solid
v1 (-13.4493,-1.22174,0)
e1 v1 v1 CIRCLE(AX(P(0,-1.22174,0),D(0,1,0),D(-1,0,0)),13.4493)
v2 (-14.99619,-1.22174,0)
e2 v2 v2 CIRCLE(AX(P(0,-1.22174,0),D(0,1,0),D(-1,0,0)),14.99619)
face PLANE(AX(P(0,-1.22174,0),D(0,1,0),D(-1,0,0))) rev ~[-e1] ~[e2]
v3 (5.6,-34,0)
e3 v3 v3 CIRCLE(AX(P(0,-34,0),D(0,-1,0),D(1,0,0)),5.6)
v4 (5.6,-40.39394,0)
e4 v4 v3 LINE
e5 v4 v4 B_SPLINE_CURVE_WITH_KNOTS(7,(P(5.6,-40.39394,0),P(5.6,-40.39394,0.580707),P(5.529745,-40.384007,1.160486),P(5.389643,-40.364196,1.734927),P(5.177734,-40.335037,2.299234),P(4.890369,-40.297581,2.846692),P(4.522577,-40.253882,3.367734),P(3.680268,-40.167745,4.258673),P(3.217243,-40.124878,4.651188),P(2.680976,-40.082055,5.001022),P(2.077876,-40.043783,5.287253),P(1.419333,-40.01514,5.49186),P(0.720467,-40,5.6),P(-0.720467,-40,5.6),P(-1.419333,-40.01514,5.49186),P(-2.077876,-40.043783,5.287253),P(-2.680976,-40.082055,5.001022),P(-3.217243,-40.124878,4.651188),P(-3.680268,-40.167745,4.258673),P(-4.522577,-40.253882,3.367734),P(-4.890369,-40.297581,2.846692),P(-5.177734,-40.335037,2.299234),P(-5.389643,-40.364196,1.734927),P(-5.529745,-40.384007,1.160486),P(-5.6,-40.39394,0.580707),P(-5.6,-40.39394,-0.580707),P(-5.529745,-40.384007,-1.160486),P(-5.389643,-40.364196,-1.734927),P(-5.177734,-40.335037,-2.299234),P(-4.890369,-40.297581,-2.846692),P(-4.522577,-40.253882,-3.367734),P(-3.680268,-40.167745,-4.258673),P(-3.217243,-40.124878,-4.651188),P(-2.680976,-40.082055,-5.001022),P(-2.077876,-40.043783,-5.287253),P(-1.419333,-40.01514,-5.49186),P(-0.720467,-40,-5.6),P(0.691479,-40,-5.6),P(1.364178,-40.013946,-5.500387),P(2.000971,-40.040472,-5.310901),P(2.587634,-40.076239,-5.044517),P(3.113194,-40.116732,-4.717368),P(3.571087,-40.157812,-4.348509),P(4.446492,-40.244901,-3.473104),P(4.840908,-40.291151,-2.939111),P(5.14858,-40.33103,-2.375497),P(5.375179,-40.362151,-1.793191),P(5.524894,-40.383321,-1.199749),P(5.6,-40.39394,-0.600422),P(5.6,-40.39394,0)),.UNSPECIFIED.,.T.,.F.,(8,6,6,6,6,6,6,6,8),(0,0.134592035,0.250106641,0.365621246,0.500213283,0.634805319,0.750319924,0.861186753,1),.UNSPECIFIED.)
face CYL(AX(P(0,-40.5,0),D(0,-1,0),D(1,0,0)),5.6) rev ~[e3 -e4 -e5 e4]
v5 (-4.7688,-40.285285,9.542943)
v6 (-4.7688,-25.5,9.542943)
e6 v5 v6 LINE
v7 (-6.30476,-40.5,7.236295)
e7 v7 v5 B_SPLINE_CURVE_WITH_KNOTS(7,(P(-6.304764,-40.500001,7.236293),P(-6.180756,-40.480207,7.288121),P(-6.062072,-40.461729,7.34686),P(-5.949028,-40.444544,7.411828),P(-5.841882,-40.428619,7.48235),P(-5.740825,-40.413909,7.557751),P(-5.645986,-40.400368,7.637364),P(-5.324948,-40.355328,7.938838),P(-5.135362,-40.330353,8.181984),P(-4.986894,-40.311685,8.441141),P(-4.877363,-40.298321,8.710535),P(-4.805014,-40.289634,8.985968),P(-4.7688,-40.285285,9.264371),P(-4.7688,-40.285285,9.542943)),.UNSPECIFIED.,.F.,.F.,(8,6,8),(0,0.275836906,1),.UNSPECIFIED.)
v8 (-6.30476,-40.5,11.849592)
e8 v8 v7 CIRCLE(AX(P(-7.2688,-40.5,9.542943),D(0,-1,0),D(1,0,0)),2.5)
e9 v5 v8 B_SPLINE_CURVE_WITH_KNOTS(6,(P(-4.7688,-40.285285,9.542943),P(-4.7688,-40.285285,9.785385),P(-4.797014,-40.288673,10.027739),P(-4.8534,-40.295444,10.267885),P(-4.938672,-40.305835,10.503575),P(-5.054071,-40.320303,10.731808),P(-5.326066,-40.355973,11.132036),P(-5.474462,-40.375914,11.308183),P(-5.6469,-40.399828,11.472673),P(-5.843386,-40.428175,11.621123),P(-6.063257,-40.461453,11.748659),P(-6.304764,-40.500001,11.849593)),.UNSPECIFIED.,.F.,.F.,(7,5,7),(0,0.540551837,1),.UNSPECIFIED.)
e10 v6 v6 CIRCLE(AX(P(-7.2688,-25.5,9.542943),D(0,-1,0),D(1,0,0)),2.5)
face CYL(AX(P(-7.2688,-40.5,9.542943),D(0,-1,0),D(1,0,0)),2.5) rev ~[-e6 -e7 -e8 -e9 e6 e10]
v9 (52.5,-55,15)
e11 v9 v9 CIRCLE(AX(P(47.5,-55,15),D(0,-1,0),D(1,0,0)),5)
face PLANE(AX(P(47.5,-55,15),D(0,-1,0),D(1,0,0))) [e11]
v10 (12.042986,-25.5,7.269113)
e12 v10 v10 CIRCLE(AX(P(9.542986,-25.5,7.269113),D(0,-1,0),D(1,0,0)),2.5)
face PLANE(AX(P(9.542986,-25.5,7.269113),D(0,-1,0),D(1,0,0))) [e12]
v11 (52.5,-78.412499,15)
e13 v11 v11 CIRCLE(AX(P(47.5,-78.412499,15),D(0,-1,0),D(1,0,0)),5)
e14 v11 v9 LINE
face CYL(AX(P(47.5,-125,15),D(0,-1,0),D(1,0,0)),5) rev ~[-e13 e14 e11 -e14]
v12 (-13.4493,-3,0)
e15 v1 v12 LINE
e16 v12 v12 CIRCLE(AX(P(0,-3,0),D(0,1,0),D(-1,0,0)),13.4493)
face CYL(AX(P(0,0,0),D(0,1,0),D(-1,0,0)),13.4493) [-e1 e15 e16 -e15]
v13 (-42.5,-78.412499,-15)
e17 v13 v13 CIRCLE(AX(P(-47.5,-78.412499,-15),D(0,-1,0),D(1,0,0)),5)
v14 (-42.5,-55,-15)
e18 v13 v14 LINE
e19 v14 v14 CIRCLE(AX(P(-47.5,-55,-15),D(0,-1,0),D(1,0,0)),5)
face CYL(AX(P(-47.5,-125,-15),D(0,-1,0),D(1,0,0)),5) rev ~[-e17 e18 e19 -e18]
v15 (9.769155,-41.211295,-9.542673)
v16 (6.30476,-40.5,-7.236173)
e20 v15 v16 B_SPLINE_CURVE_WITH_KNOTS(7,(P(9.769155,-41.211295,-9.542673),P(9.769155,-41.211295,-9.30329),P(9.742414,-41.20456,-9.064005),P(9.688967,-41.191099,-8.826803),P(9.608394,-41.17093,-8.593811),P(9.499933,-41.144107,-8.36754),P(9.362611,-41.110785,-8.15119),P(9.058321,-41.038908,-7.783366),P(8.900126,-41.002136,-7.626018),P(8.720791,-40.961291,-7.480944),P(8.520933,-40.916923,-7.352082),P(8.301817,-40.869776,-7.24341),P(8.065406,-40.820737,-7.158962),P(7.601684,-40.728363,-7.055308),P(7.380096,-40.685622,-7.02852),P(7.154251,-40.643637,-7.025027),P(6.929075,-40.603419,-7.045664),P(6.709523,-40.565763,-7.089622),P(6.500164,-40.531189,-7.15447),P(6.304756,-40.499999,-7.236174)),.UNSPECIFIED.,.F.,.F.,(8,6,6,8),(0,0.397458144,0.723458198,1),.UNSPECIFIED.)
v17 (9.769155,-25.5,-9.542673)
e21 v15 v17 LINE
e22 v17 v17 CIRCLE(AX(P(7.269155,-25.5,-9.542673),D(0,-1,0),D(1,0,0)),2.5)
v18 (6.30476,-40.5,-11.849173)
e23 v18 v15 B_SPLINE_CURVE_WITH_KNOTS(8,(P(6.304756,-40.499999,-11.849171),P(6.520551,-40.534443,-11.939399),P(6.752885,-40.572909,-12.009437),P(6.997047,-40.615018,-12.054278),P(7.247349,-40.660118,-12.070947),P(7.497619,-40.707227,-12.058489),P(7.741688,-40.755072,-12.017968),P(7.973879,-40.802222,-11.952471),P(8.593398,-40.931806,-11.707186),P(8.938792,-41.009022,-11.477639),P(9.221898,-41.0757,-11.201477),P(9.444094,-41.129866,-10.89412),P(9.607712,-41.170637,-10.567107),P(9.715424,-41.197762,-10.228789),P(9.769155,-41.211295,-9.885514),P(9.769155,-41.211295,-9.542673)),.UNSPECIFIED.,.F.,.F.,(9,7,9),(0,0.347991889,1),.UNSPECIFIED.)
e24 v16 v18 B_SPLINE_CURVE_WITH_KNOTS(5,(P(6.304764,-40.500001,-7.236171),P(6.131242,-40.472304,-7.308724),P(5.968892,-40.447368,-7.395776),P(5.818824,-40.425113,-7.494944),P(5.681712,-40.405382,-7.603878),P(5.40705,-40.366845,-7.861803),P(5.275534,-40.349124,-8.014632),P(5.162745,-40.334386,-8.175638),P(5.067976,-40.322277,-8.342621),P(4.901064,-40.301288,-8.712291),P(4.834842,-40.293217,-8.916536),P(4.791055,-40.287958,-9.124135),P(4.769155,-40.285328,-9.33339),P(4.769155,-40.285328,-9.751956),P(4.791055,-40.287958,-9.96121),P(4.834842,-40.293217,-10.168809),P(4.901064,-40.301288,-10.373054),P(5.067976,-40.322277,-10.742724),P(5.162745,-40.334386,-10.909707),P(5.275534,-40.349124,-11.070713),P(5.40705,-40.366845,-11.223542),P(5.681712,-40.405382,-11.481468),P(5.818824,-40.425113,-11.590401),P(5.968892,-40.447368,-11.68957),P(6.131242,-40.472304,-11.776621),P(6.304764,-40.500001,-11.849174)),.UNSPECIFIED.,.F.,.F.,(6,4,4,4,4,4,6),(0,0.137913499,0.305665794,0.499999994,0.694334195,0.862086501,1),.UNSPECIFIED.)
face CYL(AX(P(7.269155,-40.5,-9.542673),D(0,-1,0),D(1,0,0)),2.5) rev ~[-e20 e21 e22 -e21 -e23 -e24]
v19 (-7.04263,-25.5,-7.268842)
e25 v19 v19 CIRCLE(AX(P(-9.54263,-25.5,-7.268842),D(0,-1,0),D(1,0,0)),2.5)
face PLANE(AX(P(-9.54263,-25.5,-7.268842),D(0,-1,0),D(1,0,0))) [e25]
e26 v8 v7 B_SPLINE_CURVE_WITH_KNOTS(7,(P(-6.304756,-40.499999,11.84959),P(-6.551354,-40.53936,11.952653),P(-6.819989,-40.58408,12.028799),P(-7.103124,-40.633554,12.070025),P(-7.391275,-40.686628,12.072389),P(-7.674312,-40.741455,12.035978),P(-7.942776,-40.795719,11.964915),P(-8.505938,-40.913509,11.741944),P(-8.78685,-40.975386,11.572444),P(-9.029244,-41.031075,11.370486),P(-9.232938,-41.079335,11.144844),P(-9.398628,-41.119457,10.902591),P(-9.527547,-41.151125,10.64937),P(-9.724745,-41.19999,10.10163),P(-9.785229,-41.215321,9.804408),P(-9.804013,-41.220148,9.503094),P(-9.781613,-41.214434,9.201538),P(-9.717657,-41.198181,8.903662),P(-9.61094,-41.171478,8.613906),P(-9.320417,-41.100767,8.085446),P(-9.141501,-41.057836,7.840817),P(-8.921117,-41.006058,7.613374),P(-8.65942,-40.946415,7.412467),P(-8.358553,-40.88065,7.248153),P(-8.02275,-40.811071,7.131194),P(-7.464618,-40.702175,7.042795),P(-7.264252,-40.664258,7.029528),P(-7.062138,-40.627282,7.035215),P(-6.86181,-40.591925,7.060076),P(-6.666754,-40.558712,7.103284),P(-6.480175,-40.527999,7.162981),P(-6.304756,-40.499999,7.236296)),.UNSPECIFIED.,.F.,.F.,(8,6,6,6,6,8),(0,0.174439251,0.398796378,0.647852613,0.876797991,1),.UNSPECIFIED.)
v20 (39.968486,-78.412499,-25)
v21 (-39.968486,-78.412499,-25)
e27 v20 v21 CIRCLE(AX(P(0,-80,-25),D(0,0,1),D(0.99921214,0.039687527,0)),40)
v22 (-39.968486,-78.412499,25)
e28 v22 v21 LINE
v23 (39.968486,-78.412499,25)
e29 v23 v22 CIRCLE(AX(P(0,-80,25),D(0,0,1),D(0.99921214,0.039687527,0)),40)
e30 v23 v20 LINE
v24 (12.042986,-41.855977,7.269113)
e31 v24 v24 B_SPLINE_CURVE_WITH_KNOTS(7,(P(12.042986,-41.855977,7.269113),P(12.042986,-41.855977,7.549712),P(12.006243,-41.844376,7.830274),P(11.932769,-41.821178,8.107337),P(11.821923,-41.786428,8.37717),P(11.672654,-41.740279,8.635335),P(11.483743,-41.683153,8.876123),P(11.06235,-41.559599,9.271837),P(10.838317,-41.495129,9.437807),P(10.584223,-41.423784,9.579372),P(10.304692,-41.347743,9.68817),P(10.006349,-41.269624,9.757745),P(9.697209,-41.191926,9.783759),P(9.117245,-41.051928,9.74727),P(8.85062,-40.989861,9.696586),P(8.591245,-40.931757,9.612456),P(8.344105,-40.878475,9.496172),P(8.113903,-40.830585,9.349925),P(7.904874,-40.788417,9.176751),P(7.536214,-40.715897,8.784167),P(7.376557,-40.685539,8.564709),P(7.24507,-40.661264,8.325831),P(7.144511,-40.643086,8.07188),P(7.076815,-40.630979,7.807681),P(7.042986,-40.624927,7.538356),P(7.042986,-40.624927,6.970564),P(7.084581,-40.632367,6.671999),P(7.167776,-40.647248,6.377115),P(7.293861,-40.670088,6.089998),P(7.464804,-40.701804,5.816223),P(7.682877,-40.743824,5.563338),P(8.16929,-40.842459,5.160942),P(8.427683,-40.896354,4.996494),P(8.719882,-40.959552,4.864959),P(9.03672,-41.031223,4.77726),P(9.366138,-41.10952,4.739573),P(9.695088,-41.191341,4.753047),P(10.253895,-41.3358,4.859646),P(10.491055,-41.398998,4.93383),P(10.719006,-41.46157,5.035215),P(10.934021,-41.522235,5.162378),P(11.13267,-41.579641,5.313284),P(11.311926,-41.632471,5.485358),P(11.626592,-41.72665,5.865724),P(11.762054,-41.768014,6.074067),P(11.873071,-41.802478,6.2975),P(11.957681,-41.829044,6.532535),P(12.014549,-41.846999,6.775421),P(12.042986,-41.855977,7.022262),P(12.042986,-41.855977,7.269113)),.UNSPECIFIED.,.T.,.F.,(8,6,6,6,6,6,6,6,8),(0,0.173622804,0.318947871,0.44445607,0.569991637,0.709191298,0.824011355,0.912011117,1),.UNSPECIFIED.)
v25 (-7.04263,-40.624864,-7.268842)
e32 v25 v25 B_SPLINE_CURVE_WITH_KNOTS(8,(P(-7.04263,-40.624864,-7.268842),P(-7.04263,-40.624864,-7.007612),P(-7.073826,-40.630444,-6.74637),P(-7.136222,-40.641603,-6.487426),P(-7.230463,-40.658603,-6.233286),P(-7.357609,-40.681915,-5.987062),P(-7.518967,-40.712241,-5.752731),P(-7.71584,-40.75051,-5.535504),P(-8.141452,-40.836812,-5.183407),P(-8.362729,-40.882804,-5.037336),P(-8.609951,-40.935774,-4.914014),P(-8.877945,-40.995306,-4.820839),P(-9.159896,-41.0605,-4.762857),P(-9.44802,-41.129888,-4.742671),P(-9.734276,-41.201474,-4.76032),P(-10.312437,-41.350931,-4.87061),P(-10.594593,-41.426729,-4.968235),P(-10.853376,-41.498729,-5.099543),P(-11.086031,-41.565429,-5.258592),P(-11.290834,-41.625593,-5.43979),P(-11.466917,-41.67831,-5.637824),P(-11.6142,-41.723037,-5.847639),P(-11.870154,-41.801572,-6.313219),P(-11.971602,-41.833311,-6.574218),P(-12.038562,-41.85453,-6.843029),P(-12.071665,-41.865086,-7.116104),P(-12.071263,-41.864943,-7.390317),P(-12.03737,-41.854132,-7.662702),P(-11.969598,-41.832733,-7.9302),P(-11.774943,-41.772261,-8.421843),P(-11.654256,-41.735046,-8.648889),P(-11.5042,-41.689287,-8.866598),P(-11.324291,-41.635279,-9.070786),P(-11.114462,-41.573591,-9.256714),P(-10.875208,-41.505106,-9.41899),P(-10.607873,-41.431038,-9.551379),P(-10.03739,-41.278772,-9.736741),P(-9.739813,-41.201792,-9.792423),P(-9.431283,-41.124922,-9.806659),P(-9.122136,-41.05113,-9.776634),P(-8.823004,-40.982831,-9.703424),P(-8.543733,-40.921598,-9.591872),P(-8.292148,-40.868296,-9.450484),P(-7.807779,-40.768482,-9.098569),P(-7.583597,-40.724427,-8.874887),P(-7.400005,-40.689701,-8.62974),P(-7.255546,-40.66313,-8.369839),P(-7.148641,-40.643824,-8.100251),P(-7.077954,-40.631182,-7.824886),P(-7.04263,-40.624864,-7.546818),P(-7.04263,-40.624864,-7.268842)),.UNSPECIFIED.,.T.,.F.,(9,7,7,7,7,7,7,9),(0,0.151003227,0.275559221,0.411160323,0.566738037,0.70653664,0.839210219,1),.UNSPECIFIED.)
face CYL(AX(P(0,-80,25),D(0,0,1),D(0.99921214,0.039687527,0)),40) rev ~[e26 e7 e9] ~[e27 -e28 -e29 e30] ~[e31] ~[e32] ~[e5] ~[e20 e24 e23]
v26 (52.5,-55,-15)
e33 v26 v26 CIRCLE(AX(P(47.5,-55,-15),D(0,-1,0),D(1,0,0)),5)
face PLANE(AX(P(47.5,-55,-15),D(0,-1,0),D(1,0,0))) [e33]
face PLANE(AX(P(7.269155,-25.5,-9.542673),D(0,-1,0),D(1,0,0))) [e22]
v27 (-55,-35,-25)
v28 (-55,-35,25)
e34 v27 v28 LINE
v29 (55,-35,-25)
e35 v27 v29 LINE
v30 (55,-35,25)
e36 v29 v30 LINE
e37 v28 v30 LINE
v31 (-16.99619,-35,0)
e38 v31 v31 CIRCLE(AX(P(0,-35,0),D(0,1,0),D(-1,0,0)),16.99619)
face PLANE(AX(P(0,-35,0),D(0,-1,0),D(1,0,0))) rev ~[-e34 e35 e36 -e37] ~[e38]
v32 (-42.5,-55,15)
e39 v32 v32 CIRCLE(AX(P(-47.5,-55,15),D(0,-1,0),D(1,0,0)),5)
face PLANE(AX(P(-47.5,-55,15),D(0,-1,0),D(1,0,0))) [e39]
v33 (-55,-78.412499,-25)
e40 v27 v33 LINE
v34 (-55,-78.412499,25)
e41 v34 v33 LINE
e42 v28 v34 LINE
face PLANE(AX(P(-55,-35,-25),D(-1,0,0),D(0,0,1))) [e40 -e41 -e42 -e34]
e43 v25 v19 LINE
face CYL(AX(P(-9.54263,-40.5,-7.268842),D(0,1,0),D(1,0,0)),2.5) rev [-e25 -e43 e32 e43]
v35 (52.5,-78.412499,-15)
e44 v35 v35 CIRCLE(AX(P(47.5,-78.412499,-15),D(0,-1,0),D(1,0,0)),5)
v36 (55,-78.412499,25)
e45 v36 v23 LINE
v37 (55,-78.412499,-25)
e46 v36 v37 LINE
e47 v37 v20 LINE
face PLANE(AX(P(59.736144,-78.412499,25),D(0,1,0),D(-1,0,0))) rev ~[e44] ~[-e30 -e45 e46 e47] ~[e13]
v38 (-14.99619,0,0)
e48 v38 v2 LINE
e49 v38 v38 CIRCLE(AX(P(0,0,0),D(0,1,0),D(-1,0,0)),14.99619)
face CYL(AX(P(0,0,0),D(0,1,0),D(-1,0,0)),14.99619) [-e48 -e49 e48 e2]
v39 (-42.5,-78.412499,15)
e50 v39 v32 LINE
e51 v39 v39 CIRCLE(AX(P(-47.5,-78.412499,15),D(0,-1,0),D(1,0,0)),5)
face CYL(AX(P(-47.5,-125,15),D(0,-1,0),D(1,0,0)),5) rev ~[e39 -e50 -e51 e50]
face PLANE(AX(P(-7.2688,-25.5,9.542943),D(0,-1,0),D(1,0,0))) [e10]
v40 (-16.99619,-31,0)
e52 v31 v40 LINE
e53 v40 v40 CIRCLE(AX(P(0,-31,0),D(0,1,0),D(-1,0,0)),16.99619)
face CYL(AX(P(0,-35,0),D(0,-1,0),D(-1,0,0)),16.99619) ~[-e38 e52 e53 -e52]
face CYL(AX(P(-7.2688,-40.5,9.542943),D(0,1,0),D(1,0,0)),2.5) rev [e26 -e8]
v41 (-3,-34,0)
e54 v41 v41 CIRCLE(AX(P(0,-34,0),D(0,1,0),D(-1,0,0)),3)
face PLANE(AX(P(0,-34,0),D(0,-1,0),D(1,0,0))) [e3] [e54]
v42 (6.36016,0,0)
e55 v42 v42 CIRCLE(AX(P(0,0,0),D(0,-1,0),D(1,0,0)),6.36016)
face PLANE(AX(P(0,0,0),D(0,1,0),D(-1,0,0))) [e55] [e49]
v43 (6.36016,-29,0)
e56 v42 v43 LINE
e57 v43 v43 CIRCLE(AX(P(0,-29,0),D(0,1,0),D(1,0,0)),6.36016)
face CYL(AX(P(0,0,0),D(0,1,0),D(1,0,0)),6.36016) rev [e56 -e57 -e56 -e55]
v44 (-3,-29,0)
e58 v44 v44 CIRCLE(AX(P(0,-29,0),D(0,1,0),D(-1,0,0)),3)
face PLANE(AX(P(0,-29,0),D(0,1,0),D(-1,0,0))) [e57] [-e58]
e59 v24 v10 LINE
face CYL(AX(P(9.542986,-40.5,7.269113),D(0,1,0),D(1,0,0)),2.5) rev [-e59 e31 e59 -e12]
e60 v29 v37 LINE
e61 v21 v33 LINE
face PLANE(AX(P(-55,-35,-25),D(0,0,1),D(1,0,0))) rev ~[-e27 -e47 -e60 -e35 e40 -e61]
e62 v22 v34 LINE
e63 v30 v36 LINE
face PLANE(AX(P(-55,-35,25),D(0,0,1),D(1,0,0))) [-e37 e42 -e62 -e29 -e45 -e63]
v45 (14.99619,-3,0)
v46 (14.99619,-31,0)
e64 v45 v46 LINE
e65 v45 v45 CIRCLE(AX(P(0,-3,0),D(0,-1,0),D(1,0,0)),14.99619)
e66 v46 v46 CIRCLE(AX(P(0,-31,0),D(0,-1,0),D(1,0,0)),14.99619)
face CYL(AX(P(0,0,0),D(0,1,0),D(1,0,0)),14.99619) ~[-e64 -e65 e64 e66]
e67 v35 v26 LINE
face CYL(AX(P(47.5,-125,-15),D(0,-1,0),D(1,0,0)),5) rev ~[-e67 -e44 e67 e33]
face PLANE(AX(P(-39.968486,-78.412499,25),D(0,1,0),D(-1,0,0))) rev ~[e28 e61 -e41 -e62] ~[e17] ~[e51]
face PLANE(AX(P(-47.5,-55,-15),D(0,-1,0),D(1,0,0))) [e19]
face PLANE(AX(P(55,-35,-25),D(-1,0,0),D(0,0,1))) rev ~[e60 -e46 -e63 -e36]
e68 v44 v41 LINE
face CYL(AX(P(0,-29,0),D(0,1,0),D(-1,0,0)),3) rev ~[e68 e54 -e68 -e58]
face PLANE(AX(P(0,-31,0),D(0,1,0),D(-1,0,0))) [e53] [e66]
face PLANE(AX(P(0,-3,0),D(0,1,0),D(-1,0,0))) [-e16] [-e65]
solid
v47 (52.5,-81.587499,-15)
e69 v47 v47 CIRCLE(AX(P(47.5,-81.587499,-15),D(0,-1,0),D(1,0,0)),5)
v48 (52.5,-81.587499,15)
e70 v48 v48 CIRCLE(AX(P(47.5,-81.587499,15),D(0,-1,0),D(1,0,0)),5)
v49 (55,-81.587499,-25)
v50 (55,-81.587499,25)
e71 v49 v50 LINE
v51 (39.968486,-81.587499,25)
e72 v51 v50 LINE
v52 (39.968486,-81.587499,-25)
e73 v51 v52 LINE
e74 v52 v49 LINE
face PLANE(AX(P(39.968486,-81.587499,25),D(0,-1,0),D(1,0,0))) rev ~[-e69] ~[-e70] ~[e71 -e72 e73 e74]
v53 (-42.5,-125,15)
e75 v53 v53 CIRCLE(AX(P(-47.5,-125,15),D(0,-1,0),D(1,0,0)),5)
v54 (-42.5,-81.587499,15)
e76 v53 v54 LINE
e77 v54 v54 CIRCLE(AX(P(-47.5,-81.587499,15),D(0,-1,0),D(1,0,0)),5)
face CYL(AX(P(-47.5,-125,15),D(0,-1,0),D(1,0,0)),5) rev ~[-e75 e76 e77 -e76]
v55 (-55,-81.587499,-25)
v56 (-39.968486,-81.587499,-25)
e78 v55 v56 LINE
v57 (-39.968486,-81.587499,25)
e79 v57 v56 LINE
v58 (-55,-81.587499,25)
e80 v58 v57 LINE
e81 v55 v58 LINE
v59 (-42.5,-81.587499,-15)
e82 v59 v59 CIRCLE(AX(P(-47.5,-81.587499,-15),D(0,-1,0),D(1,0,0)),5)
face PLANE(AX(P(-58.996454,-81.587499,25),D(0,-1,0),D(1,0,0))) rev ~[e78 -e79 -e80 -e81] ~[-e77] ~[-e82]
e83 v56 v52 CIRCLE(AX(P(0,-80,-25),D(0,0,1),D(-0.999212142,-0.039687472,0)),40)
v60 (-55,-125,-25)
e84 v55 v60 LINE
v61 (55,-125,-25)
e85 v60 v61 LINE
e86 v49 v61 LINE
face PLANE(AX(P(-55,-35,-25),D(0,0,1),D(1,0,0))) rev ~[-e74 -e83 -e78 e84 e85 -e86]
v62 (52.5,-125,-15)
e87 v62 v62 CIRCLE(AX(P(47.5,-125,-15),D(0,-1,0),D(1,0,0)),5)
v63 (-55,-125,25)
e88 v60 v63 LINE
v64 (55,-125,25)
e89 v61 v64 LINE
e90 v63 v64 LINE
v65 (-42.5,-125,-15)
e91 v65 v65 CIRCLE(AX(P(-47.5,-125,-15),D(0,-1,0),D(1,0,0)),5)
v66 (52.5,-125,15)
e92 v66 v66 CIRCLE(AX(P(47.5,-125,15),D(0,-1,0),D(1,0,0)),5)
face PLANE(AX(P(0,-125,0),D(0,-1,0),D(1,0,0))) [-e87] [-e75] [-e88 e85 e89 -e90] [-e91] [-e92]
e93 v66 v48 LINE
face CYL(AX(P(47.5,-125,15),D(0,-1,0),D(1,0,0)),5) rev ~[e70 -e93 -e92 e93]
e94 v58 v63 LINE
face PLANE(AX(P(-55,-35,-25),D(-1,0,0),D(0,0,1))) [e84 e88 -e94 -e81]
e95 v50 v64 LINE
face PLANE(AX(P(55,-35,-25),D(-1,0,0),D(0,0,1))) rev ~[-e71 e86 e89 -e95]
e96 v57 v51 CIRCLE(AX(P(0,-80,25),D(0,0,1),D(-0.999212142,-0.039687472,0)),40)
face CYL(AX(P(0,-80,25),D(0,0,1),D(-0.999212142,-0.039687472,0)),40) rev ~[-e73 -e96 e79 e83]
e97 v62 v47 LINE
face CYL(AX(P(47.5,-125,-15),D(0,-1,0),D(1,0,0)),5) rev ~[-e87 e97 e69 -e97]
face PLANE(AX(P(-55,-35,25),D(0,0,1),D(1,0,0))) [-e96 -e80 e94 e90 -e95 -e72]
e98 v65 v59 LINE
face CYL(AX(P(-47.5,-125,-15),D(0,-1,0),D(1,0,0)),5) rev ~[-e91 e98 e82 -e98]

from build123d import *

# Parameters (mm, degrees)
F0_R           = 14.99619
F0_R_2         = 6.36016
F1_DEPTH       = 35
F2_W           = 110
F2_H           = 50
F3_DEPTH       = 90
F4_R           = 5
F5_DEPTH       = 70
F7_DEPTH       = 50.001
F8_R           = 14.99619
F8_R_2         = 13.4493
F9_DEPTH       = 3
F10_R          = 14.99619
F10_R_2        = 13.4493
F11_DEPTH      = 1.22174
F12_R          = 16.99619
F12_R_2        = 14.99619
F13_DEPTH      = 4
F14_R          = 7.8345578302
F15_DEPTH      = 6
F16_R          = 3
F17_DEPTH      = 25
F19_R          = 5.6
F20_DEPTH      = 6.5
F19_R_2        = 2.5
F21_DEPTH      = 15
F21_DEPTH_BACK = 25


# Not quite as in the source:
# - a feature names something its author has since deleted; it is built from what else it names


with BuildPart() as f1:
    # F0 (on Front) → F1 (new body)
    with BuildSketch(Plane.XZ):
        Circle(F0_R)
        Circle(F0_R_2, mode=Mode.SUBTRACT)
    extrude(amount=F1_DEPTH)

    # F2 (on face) → F3 (join)
    with BuildSketch(Plane.XZ.offset(35)):
        Rectangle(F2_W, F2_H)
    extrude(amount=F3_DEPTH)

    # F4 (on face) → F5 (cut)
    with BuildSketch(Plane.XZ.offset(125)):
        with Locations((-47.5, 15)):
            Circle(F4_R)
        with Locations((-47.5, -15)):
            Circle(F4_R)
        with Locations((47.5, 15)):
            Circle(F4_R)
        with Locations((47.5, -15)):
            Circle(F4_R)
    extrude(amount=-F5_DEPTH, mode=Mode.SUBTRACT)

    # F6 (on face) → F7 (cut, through all)
    with BuildSketch(Plane.XY.offset(25)):
        with BuildLine():
            Line((-58.9964538813, -81.5874989), (-39.9684856761, -81.5874989))
            ThreePointArc((-39.9684856761, -81.5874989), (0, -120), (39.9684856761, -81.5874989))
            Line((39.9684856761, -81.5874989), (59.7361437976, -81.5874989))
            Line((59.7361437976, -81.5874989), (59.7361437976, -78.4124989))
            Line((59.7361437976, -78.4124989), (39.9684855887, -78.4124989))
            ThreePointArc((39.9684855887, -78.4124989), (0, -40), (-39.9684855887, -78.4124989))
            Line((-39.9684855887, -78.4124989), (-58.9964538813, -78.4124989))
            Line((-58.9964538813, -78.4124989), (-58.9964538813, -81.5874989))
        make_face()
    extrude(amount=-F7_DEPTH, mode=Mode.SUBTRACT)

    # F8 (on face) → F9 (cut)
    with BuildSketch(Plane(origin=(0, 0, 0), x_dir=(-1, 0, 0), z_dir=(0, 1, 0))):
        Circle(F8_R)
        Circle(F8_R_2, mode=Mode.SUBTRACT)
    extrude(amount=-F9_DEPTH, mode=Mode.SUBTRACT)

    # F10 (on face) → F11 (join)
    with BuildSketch(Plane(origin=(0, 0, 0), x_dir=(-1, 0, 0), z_dir=(0, 1, 0))):
        Circle(F10_R)
        Circle(F10_R_2, mode=Mode.SUBTRACT)
    extrude(amount=-F11_DEPTH)

    # F12 (on face) → F13 (join)
    with BuildSketch(Plane(origin=(0, -35, 0), x_dir=(-1, 0, 0), z_dir=(0, 1, 0))):
        Circle(F12_R)
        Circle(F12_R_2, mode=Mode.SUBTRACT)
    extrude(amount=F13_DEPTH)

    # F14 (on face) → F15 (join)
    with BuildSketch(Plane(origin=(0, -35, 0), x_dir=(-1, 0, 0), z_dir=(0, 1, 0))):
        Circle(F14_R)
    extrude(amount=F15_DEPTH)

    # F16 (on face) → F17 (cut)
    with BuildSketch(Plane(origin=(0, -29, 0), x_dir=(-1, 0, 0), z_dir=(0, 1, 0))):
        Circle(F16_R)
    extrude(amount=-F17_DEPTH, mode=Mode.SUBTRACT)

    # F19 (on offset) → F20 (cut)
    with BuildSketch(Plane.XZ.offset(40.5)):
        Circle(F19_R)
    extrude(amount=-F20_DEPTH, mode=Mode.SUBTRACT)

    # F19 (on offset) → F21 (cut, two sides)
    with BuildSketch(Plane.XZ.offset(40.5)) as f21_sk:
        with Locations((7.2691551531, -9.5426725713)):
            Circle(F19_R_2)
        with Locations((9.5429855552, 7.2691128213)):
            Circle(F19_R_2)
        with Locations((-7.2687998374, 9.5429432235)):
            Circle(F19_R_2)
        with Locations((-9.5426302396, -7.2688421692)):
            Circle(F19_R_2)
    extrude(amount=-F21_DEPTH, mode=Mode.SUBTRACT)
    extrude(f21_sk.sketch, amount=F21_DEPTH_BACK, mode=Mode.SUBTRACT)


solid = f1.part
